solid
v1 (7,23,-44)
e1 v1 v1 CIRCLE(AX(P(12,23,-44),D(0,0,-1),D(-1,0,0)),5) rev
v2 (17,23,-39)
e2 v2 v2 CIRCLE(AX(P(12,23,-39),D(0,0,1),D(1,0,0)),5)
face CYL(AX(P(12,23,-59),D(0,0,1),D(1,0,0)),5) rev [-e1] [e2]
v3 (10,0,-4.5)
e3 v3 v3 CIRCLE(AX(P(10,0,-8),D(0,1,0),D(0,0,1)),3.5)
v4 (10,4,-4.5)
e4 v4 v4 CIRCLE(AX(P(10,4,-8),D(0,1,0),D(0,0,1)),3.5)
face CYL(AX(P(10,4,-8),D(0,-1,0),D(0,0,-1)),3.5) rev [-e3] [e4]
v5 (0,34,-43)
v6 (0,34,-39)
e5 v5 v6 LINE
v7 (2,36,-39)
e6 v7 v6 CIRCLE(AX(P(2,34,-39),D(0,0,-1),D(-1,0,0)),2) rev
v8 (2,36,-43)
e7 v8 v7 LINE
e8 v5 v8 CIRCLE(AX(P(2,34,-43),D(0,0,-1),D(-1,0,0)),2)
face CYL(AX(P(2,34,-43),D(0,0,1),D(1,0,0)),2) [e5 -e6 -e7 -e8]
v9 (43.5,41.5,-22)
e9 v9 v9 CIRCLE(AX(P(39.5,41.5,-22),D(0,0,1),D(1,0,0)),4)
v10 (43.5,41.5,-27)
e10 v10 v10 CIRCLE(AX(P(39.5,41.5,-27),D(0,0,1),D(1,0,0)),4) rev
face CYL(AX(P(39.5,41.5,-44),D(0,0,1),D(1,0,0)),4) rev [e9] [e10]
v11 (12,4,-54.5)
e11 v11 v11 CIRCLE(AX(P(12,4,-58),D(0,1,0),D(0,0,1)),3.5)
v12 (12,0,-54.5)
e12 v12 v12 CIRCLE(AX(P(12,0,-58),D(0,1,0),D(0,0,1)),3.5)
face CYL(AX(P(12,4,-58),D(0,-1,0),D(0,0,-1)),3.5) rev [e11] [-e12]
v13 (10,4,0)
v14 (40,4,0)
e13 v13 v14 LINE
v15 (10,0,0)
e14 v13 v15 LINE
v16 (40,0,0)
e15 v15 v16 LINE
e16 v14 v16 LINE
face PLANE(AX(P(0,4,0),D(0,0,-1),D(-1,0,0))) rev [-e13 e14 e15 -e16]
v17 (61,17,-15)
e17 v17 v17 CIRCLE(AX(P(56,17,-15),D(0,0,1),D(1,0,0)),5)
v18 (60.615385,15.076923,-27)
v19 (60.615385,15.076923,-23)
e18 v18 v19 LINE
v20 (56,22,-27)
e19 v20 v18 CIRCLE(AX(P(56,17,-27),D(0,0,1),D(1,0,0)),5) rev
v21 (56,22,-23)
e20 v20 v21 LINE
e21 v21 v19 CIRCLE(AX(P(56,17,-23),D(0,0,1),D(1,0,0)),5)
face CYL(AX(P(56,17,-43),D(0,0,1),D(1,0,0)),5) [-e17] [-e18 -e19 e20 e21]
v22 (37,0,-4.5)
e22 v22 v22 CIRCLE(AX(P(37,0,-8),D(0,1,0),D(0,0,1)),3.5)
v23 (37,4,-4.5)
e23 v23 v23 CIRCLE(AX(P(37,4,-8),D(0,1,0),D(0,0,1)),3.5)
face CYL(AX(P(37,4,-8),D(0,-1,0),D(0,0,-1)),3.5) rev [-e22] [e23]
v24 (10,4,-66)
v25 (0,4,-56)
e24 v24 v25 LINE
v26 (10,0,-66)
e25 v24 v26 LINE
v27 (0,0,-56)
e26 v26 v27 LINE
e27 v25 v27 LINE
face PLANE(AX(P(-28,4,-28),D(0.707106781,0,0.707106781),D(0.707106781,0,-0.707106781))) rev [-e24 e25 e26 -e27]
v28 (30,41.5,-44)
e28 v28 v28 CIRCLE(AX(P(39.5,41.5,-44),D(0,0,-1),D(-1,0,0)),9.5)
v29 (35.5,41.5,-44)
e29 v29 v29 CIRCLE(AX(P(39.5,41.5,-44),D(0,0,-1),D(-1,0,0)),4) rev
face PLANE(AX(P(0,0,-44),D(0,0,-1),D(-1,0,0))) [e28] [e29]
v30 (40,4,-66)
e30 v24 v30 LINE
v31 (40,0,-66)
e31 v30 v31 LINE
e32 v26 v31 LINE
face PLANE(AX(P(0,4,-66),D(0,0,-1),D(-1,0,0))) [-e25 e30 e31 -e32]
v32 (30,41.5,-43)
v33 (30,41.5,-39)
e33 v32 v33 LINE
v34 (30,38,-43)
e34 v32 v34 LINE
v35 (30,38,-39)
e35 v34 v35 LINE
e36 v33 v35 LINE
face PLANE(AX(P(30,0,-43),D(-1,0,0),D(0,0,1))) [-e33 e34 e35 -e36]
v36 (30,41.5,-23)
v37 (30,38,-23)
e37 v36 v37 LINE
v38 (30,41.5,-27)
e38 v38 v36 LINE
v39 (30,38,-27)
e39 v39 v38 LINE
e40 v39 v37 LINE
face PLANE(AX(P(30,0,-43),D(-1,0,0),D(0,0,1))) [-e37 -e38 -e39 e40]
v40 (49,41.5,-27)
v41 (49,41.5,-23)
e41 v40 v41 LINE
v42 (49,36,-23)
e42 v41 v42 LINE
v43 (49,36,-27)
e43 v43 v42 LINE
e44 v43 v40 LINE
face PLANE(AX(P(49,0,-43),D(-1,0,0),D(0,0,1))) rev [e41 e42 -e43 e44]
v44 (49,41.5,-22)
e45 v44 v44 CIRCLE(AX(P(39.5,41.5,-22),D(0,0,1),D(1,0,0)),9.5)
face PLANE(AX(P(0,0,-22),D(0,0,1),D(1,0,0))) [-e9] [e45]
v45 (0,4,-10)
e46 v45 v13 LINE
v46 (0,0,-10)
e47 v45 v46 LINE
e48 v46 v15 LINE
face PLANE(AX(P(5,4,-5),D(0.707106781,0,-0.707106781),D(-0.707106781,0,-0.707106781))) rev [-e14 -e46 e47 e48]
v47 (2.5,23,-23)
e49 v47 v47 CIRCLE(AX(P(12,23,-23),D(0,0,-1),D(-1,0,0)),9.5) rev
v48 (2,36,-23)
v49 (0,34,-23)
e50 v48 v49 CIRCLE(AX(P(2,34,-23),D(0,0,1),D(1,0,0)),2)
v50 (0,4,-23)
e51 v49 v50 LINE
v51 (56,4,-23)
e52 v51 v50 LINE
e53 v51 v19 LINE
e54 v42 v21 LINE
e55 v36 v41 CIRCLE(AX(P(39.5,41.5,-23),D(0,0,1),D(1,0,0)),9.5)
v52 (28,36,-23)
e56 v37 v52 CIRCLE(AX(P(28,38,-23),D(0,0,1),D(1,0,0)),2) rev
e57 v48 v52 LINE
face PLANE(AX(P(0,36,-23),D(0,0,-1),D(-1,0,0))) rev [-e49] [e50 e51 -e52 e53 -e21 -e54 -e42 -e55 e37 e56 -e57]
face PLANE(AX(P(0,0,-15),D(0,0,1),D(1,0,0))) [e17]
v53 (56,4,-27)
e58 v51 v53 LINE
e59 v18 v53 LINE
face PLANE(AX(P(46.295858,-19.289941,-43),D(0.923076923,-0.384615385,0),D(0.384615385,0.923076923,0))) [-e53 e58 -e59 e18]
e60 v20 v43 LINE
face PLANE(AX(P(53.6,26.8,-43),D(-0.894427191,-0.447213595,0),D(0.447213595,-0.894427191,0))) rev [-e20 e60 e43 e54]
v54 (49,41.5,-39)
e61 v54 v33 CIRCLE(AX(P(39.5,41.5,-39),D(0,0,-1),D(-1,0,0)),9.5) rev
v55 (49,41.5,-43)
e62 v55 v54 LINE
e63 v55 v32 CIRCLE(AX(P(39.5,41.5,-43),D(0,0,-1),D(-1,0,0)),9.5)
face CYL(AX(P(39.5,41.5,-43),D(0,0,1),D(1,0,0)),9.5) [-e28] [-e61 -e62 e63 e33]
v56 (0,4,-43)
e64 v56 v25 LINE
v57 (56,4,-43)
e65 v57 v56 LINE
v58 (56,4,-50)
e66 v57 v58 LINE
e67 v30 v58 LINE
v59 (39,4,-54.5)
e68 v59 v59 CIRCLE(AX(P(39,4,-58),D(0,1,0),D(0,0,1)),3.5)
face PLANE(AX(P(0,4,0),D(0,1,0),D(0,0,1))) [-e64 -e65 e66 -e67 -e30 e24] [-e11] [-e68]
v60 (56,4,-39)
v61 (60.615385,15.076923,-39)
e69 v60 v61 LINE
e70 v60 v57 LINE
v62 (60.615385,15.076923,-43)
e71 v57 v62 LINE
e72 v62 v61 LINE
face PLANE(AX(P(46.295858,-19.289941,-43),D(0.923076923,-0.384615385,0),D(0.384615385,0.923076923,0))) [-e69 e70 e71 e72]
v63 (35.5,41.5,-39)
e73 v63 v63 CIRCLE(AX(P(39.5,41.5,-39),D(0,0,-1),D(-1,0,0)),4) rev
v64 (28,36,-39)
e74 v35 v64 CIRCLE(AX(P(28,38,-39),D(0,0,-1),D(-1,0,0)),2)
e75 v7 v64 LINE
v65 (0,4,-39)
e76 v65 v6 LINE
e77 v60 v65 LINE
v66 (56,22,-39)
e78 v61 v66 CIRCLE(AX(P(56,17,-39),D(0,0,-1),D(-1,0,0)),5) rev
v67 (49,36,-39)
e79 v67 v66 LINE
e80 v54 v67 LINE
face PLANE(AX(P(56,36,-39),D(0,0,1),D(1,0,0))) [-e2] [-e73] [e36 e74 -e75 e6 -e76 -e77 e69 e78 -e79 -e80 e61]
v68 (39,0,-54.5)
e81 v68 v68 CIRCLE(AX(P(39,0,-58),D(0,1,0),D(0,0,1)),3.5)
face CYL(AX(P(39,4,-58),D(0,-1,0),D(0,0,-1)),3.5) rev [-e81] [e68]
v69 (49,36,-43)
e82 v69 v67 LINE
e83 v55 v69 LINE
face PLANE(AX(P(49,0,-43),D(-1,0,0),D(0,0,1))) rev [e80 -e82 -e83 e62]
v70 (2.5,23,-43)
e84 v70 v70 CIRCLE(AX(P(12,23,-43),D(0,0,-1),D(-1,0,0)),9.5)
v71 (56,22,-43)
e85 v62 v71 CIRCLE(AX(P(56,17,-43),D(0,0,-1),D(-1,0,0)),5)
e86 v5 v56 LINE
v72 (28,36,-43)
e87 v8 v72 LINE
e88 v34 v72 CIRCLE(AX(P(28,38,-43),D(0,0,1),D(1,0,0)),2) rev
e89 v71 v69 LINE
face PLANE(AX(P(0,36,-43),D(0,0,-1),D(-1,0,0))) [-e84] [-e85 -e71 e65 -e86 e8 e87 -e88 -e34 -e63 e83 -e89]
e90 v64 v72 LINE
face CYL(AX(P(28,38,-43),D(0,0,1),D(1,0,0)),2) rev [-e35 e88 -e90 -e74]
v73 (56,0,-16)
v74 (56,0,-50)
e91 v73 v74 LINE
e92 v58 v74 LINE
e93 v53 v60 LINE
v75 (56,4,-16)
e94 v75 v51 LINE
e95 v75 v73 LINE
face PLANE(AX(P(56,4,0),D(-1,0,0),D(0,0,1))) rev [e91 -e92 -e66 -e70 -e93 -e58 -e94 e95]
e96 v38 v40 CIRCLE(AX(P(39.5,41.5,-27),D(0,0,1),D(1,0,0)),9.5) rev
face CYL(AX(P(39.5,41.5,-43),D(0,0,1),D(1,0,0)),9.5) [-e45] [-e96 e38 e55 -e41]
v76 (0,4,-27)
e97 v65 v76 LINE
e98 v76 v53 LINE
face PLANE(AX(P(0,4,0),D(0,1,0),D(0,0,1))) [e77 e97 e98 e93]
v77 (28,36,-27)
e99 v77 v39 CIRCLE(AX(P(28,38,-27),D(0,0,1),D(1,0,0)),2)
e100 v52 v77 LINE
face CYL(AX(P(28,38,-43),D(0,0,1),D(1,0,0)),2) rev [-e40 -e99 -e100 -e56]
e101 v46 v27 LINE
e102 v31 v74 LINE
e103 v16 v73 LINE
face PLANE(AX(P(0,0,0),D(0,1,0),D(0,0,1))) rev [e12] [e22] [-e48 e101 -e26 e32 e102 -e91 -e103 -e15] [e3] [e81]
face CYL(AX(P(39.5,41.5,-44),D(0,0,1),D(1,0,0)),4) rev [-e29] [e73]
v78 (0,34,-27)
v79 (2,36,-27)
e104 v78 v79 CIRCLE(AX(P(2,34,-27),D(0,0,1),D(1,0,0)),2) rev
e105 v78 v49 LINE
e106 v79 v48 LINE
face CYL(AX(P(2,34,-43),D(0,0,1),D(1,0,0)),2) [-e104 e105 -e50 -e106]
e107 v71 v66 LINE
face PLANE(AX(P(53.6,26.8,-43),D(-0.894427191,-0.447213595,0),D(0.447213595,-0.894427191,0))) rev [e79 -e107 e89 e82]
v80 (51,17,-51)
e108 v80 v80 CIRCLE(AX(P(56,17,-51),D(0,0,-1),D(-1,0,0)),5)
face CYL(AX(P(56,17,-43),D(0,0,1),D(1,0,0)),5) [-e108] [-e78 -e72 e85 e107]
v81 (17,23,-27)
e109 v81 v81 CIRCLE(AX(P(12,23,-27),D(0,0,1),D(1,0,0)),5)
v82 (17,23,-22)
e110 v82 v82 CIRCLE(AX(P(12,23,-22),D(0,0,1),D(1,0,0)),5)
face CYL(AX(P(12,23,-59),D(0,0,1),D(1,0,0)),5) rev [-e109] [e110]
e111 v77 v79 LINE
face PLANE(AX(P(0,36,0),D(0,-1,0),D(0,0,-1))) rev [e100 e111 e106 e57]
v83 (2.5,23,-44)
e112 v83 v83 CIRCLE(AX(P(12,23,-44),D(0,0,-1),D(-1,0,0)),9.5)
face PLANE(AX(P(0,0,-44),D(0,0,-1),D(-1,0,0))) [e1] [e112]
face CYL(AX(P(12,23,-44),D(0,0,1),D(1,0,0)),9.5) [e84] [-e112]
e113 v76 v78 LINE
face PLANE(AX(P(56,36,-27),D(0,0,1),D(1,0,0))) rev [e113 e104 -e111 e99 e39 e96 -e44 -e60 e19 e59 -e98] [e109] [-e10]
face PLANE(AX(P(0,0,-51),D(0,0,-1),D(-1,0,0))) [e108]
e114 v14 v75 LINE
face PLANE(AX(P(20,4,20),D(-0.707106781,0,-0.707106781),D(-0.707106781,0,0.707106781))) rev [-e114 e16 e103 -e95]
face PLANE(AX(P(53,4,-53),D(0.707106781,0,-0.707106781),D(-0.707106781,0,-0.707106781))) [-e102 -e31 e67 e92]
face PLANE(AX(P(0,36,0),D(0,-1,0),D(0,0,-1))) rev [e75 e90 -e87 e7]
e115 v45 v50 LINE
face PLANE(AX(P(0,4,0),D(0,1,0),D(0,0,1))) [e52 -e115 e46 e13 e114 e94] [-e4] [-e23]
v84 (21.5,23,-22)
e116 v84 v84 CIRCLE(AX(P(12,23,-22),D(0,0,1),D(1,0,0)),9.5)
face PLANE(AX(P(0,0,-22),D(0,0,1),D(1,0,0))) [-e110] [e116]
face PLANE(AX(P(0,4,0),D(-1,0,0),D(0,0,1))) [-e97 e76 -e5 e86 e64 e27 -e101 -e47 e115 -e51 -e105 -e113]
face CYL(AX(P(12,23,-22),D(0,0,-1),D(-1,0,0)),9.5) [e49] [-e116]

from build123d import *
from build123d.topology import SkipClean

# Parameters (mm, degrees)
SKETCH1_R               = 3.5
SKETCH1_W               = 56
SKETCH1_H               = 4
SKETCH1_H_2             = 12
BOSS_EXTRUDE1_DEPTH     = 4
SKETCH1_3_W             = 56
SKETCH1_3_H             = 4
BOSS_EXTRUDE2_DEPTH     = 36
SKETCH2_R               = 5
CUT_EXTRUDE1_DEPTH      = 36
BOSS_EXTRUDE3_START     = -20
BOSS_EXTRUDE3_OUTLINE_R = 9.5
BOSS_EXTRUDE3_DEPTH     = 20
CUT_EXTRUDE2_START      = -21
SKETCH2_4_R             = 4
CUT_EXTRUDE2_DEPTH      = 21
SKETCH4_W               = 61
SKETCH4_H               = 12
CUT_EXTRUDE3_DEPTH      = 47
BOSS_EXTRUDE4_START     = 1
SKETCH5_R               = 4
SKETCH5_R_2             = 9.5
SKETCH5_R_3             = 5
BOSS_EXTRUDE4_DEPTH     = 1
BOSS_EXTRUDE5_START     = 8
BOSS_EXTRUDE5_DEPTH     = 8
BOSS_EXTRUDE6_DEPTH     = 8
SKETCH2_6_R             = 9.5
SKETCH2_6_R_2           = 5
SKETCH2_6_R_3           = 4
BOSS_EXTRUDE7_DEPTH     = 1


# Read off the part's stored shape, not the designer's step: Boss-Extrude3
with BuildPart() as part:
    # Sketch1 → Boss-Extrude1 (new body)
    # profile 1 of 5: a face of its own
    with BuildSketch(Plane(origin=(0, 0, 0), x_dir=(1, 0, 0), z_dir=(0, 1, 0))):
        Polygon((56, 23), (0, 23), (0, 10), (10, 0), (40, 0), (56, 16), align=None)
        with Locations(Location((10, 8, 0), (0, 0, 270))):
            Circle(SKETCH1_R, mode=Mode.SUBTRACT)
        with Locations(Location((37, 8, 0), (0, 0, 270))):
            Circle(SKETCH1_R, mode=Mode.SUBTRACT)
    # profile 2 of 5: a face of its own
    with BuildSketch(Plane(origin=(0, 0, 0), x_dir=(1, 0, 0), z_dir=(0, 1, 0))):
        with Locations((28, 25)):
            Rectangle(SKETCH1_W, SKETCH1_H)
    # profile 3 of 5: a face of its own
    with BuildSketch(Plane(origin=(0, 0, 0), x_dir=(1, 0, 0), z_dir=(0, 1, 0))):
        with Locations((28, 33)):
            Rectangle(SKETCH1_W, SKETCH1_H_2)
    # profile 4 of 5: a face of its own
    with BuildSketch(Plane(origin=(0, 0, 0), x_dir=(1, 0, 0), z_dir=(0, 1, 0))):
        with Locations((28, 41)):
            Rectangle(SKETCH1_W, SKETCH1_H)
    # profile 5 of 5: a face of its own
    with BuildSketch(Plane(origin=(0, 0, 0), x_dir=(1, 0, 0), z_dir=(0, 1, 0))):
        Polygon((40, 66), (10, 66), (0, 56), (0, 43), (56, 43), (56, 50), align=None)
        with Locations(Location((12, 58, 0), (0, 0, 270))):
            Circle(SKETCH1_R, mode=Mode.SUBTRACT)
        with Locations(Location((39, 58, 0), (0, 0, 270))):
            Circle(SKETCH1_R, mode=Mode.SUBTRACT)
    extrude(amount=BOSS_EXTRUDE1_DEPTH)

    # Sketch1<3> → Boss-Extrude2 (add)
    with BuildSketch(Plane(origin=(0, 0, 0), x_dir=(1, 0, 0), z_dir=(0, 1, 0))):
        with Locations((28, 41)):
            Rectangle(SKETCH1_3_W, SKETCH1_3_H)
        with Locations((28, 25)):
            Rectangle(SKETCH1_3_W, SKETCH1_3_H)
    extrude(amount=BOSS_EXTRUDE2_DEPTH)

    # Sketch2 → Cut-Extrude1 (cut)
    with BuildSketch(Plane.XY.offset(-23)):
        with Locations((12, 23)):
            Circle(SKETCH2_R)
    extrude(amount=-CUT_EXTRUDE1_DEPTH, mode=Mode.SUBTRACT)

    # Boss-Extrude3 outline → Boss-Extrude3 (add)
    with BuildSketch(Plane.XY.offset(-23).offset(BOSS_EXTRUDE3_START)):
        with BuildLine():
            Line((28, 36), (2, 36))
            ThreePointArc((2, 36), (0.585786438, 35.414213562), (0, 34))
            Line((0, 34), (0, 4))
            Line((0, 4), (56, 4))
            Line((56, 4), (60.615384615, 15.076923077))
            ThreePointArc((60.615384615, 15.076923077), (60.160251472, 19.773500981), (56, 22))
            Line((56, 22), (49, 36))
            Line((49, 36), (49, 41.5))
            ThreePointArc((49, 41.5), (39.5, 51), (30, 41.5))
            Line((30, 41.5), (30, 38))
            ThreePointArc((30, 38), (29.414213562, 36.585786438), (28, 36))
        make_face()
        with Locations((12, 23)):
            Circle(BOSS_EXTRUDE3_OUTLINE_R, mode=Mode.SUBTRACT)
    extrude(amount=BOSS_EXTRUDE3_DEPTH)

    # Sketch2<4> → Cut-Extrude2 (cut)
    with SkipClean():  # the faces are left unmerged after this step: merging them gives an invalid solid
        with BuildSketch(Plane.XY.offset(-23).offset(CUT_EXTRUDE2_START)):
            with BuildLine():
                Line((30, 38), (30, 41.5))
                ThreePointArc((30, 41.5), (39.5, 51), (49, 41.5))
                Line((49, 41.5), (49, 36))
                Line((49, 36), (56, 36))
                Line((56, 36), (56, 22))
                ThreePointArc((56, 22), (59.535533906, 20.535533906), (61, 17))
                ThreePointArc((61, 17), (60.902903378, 16.019419324), (60.615384615, 15.076923077))
                Line((60.615384615, 15.076923077), (56, 4))
                Line((56, 4), (64.674649384, 4))
                Line((64.674649384, 4), (64.674649384, 61.803942061))
                Line((64.674649384, 61.803942061), (-6.186238706, 61.803942061))
                Line((-6.186238706, 61.803942061), (-6.186238706, 4))
                Line((-6.186238706, 4), (0, 4))
                Line((0, 4), (0, 34))
                Line((0, 34), (0, 36))
                Line((0, 36), (2, 36))
                Line((2, 36), (28, 36))
                ThreePointArc((28, 36), (29.414213562, 36.585786438), (30, 38))
            make_face()
            with BuildLine():
                ThreePointArc((0, 34), (0.585786438, 35.414213562), (2, 36))
                Line((2, 36), (0, 36))
                Line((0, 36), (0, 34))
            make_face()
            Polygon((56, 36), (49, 36), (56, 22), align=None)
            with Locations((39.5, 41.5)):
                Circle(SKETCH2_4_R)
        extrude(amount=CUT_EXTRUDE2_DEPTH, mode=Mode.SUBTRACT)
    add(part.part.scale(1), mode=Mode.REPLACE)  # the faces are merged on a copy

    # Sketch4 → Cut-Extrude3 (cut)
    with BuildSketch(Plane(origin=(0, 51, 0), x_dir=(1, 0, 0), z_dir=(0, 1, 0))):
        with Locations((30.5, 33)):
            Rectangle(SKETCH4_W, SKETCH4_H)
    extrude(amount=-CUT_EXTRUDE3_DEPTH, mode=Mode.SUBTRACT)

    # Sketch5 → Boss-Extrude4 (add)
    # profile 1 of 2: a face of its own
    with SkipClean():  # the faces are left unmerged after this step: merging them gives an invalid solid
        with BuildSketch(Plane(origin=(0, 0, -43), x_dir=(-1, 0, 0), z_dir=(0, 0, -1)).offset(BOSS_EXTRUDE4_START)):
            with BuildLine():
                ThreePointArc((-49, 41.5), (-39.5, 32), (-30, 41.5))
                ThreePointArc((-30, 41.5), (-39.5, 51), (-49, 41.5))
            make_face()
            with Locations((-39.5, 41.5)):
                Circle(SKETCH5_R, mode=Mode.SUBTRACT)
        # profile 2 of 2: a face of its own
        with BuildSketch(Plane(origin=(0, 0, -43), x_dir=(-1, 0, 0), z_dir=(0, 0, -1)).offset(BOSS_EXTRUDE4_START)):
            with Locations((-12, 23)):
                Circle(SKETCH5_R_2)
            with Locations(Location((-12, 23, 0), (0, 0, 180))):
                Circle(SKETCH5_R_3, mode=Mode.SUBTRACT)
        extrude(amount=-BOSS_EXTRUDE4_DEPTH)

    # Sketch5<3> → Boss-Extrude5 (add)
    with SkipClean():  # the faces are left unmerged after this step: merging them gives an invalid solid
        with BuildSketch(Plane(origin=(0, 0, -43), x_dir=(-1, 0, 0), z_dir=(0, 0, -1)).offset(BOSS_EXTRUDE5_START)):
            with BuildLine():
                ThreePointArc((-60.615384615, 15.076923077), (-55.019419324, 12.097096622), (-51, 17))
                ThreePointArc((-51, 17), (-52.464466094, 20.535533906), (-56, 22))
                ThreePointArc((-56, 22), (-60.160251472, 19.773500981), (-60.615384615, 15.076923077))
            make_face()
        extrude(amount=-BOSS_EXTRUDE5_DEPTH)

    # Sketch2<5> → Boss-Extrude6 (add)
    with SkipClean():  # the faces are left unmerged after this step: merging them gives an invalid solid
        with BuildSketch(Plane.XY.offset(-23)):
            with BuildLine():
                Line((56, 12), (56, 22))
                ThreePointArc((56, 22), (51, 17), (56, 12))
            make_face()
            with BuildLine():
                ThreePointArc((61, 17), (59.535533906, 20.535533906), (56, 22))
                Line((56, 22), (56, 12))
                ThreePointArc((56, 12), (58.773500981, 12.839748528), (60.615384615, 15.076923077))
                ThreePointArc((60.615384615, 15.076923077), (60.902903378, 16.019419324), (61, 17))
            make_face()
        extrude(amount=BOSS_EXTRUDE6_DEPTH)

    # Sketch2<6> → Boss-Extrude7 (add)
    # profile 1 of 3: a face of its own
    with BuildSketch(Plane.XY.offset(-23)):
        with Locations(Location((12, 23, 0), (0, 0, 180))):
            Circle(SKETCH2_6_R)
        with Locations((12, 23)):
            Circle(SKETCH2_6_R_2, mode=Mode.SUBTRACT)
    # profile 2 of 3: a face of its own
    with BuildSketch(Plane.XY.offset(-23)):
        with BuildLine():
            ThreePointArc((49, 41.5), (39.5, 51), (30, 41.5))
            ThreePointArc((30, 41.5), (30.449124805, 38.613538808), (31.754033308, 36))
            Line((31.754033308, 36), (47.245966692, 36))
            ThreePointArc((47.245966692, 36), (48.550875195, 38.613538808), (49, 41.5))
        make_face()
        with Locations(Location((39.5, 41.5, 0), (0, 0, 180))):
            Circle(SKETCH2_6_R_3, mode=Mode.SUBTRACT)
    # profile 3 of 3: a face of its own
    with BuildSketch(Plane.XY.offset(-23)):
        with BuildLine():
            Line((47.245966692, 36), (31.754033308, 36))
            ThreePointArc((31.754033308, 36), (39.5, 32), (47.245966692, 36))
        make_face()
    extrude(amount=BOSS_EXTRUDE7_DEPTH)


solid = part.part
